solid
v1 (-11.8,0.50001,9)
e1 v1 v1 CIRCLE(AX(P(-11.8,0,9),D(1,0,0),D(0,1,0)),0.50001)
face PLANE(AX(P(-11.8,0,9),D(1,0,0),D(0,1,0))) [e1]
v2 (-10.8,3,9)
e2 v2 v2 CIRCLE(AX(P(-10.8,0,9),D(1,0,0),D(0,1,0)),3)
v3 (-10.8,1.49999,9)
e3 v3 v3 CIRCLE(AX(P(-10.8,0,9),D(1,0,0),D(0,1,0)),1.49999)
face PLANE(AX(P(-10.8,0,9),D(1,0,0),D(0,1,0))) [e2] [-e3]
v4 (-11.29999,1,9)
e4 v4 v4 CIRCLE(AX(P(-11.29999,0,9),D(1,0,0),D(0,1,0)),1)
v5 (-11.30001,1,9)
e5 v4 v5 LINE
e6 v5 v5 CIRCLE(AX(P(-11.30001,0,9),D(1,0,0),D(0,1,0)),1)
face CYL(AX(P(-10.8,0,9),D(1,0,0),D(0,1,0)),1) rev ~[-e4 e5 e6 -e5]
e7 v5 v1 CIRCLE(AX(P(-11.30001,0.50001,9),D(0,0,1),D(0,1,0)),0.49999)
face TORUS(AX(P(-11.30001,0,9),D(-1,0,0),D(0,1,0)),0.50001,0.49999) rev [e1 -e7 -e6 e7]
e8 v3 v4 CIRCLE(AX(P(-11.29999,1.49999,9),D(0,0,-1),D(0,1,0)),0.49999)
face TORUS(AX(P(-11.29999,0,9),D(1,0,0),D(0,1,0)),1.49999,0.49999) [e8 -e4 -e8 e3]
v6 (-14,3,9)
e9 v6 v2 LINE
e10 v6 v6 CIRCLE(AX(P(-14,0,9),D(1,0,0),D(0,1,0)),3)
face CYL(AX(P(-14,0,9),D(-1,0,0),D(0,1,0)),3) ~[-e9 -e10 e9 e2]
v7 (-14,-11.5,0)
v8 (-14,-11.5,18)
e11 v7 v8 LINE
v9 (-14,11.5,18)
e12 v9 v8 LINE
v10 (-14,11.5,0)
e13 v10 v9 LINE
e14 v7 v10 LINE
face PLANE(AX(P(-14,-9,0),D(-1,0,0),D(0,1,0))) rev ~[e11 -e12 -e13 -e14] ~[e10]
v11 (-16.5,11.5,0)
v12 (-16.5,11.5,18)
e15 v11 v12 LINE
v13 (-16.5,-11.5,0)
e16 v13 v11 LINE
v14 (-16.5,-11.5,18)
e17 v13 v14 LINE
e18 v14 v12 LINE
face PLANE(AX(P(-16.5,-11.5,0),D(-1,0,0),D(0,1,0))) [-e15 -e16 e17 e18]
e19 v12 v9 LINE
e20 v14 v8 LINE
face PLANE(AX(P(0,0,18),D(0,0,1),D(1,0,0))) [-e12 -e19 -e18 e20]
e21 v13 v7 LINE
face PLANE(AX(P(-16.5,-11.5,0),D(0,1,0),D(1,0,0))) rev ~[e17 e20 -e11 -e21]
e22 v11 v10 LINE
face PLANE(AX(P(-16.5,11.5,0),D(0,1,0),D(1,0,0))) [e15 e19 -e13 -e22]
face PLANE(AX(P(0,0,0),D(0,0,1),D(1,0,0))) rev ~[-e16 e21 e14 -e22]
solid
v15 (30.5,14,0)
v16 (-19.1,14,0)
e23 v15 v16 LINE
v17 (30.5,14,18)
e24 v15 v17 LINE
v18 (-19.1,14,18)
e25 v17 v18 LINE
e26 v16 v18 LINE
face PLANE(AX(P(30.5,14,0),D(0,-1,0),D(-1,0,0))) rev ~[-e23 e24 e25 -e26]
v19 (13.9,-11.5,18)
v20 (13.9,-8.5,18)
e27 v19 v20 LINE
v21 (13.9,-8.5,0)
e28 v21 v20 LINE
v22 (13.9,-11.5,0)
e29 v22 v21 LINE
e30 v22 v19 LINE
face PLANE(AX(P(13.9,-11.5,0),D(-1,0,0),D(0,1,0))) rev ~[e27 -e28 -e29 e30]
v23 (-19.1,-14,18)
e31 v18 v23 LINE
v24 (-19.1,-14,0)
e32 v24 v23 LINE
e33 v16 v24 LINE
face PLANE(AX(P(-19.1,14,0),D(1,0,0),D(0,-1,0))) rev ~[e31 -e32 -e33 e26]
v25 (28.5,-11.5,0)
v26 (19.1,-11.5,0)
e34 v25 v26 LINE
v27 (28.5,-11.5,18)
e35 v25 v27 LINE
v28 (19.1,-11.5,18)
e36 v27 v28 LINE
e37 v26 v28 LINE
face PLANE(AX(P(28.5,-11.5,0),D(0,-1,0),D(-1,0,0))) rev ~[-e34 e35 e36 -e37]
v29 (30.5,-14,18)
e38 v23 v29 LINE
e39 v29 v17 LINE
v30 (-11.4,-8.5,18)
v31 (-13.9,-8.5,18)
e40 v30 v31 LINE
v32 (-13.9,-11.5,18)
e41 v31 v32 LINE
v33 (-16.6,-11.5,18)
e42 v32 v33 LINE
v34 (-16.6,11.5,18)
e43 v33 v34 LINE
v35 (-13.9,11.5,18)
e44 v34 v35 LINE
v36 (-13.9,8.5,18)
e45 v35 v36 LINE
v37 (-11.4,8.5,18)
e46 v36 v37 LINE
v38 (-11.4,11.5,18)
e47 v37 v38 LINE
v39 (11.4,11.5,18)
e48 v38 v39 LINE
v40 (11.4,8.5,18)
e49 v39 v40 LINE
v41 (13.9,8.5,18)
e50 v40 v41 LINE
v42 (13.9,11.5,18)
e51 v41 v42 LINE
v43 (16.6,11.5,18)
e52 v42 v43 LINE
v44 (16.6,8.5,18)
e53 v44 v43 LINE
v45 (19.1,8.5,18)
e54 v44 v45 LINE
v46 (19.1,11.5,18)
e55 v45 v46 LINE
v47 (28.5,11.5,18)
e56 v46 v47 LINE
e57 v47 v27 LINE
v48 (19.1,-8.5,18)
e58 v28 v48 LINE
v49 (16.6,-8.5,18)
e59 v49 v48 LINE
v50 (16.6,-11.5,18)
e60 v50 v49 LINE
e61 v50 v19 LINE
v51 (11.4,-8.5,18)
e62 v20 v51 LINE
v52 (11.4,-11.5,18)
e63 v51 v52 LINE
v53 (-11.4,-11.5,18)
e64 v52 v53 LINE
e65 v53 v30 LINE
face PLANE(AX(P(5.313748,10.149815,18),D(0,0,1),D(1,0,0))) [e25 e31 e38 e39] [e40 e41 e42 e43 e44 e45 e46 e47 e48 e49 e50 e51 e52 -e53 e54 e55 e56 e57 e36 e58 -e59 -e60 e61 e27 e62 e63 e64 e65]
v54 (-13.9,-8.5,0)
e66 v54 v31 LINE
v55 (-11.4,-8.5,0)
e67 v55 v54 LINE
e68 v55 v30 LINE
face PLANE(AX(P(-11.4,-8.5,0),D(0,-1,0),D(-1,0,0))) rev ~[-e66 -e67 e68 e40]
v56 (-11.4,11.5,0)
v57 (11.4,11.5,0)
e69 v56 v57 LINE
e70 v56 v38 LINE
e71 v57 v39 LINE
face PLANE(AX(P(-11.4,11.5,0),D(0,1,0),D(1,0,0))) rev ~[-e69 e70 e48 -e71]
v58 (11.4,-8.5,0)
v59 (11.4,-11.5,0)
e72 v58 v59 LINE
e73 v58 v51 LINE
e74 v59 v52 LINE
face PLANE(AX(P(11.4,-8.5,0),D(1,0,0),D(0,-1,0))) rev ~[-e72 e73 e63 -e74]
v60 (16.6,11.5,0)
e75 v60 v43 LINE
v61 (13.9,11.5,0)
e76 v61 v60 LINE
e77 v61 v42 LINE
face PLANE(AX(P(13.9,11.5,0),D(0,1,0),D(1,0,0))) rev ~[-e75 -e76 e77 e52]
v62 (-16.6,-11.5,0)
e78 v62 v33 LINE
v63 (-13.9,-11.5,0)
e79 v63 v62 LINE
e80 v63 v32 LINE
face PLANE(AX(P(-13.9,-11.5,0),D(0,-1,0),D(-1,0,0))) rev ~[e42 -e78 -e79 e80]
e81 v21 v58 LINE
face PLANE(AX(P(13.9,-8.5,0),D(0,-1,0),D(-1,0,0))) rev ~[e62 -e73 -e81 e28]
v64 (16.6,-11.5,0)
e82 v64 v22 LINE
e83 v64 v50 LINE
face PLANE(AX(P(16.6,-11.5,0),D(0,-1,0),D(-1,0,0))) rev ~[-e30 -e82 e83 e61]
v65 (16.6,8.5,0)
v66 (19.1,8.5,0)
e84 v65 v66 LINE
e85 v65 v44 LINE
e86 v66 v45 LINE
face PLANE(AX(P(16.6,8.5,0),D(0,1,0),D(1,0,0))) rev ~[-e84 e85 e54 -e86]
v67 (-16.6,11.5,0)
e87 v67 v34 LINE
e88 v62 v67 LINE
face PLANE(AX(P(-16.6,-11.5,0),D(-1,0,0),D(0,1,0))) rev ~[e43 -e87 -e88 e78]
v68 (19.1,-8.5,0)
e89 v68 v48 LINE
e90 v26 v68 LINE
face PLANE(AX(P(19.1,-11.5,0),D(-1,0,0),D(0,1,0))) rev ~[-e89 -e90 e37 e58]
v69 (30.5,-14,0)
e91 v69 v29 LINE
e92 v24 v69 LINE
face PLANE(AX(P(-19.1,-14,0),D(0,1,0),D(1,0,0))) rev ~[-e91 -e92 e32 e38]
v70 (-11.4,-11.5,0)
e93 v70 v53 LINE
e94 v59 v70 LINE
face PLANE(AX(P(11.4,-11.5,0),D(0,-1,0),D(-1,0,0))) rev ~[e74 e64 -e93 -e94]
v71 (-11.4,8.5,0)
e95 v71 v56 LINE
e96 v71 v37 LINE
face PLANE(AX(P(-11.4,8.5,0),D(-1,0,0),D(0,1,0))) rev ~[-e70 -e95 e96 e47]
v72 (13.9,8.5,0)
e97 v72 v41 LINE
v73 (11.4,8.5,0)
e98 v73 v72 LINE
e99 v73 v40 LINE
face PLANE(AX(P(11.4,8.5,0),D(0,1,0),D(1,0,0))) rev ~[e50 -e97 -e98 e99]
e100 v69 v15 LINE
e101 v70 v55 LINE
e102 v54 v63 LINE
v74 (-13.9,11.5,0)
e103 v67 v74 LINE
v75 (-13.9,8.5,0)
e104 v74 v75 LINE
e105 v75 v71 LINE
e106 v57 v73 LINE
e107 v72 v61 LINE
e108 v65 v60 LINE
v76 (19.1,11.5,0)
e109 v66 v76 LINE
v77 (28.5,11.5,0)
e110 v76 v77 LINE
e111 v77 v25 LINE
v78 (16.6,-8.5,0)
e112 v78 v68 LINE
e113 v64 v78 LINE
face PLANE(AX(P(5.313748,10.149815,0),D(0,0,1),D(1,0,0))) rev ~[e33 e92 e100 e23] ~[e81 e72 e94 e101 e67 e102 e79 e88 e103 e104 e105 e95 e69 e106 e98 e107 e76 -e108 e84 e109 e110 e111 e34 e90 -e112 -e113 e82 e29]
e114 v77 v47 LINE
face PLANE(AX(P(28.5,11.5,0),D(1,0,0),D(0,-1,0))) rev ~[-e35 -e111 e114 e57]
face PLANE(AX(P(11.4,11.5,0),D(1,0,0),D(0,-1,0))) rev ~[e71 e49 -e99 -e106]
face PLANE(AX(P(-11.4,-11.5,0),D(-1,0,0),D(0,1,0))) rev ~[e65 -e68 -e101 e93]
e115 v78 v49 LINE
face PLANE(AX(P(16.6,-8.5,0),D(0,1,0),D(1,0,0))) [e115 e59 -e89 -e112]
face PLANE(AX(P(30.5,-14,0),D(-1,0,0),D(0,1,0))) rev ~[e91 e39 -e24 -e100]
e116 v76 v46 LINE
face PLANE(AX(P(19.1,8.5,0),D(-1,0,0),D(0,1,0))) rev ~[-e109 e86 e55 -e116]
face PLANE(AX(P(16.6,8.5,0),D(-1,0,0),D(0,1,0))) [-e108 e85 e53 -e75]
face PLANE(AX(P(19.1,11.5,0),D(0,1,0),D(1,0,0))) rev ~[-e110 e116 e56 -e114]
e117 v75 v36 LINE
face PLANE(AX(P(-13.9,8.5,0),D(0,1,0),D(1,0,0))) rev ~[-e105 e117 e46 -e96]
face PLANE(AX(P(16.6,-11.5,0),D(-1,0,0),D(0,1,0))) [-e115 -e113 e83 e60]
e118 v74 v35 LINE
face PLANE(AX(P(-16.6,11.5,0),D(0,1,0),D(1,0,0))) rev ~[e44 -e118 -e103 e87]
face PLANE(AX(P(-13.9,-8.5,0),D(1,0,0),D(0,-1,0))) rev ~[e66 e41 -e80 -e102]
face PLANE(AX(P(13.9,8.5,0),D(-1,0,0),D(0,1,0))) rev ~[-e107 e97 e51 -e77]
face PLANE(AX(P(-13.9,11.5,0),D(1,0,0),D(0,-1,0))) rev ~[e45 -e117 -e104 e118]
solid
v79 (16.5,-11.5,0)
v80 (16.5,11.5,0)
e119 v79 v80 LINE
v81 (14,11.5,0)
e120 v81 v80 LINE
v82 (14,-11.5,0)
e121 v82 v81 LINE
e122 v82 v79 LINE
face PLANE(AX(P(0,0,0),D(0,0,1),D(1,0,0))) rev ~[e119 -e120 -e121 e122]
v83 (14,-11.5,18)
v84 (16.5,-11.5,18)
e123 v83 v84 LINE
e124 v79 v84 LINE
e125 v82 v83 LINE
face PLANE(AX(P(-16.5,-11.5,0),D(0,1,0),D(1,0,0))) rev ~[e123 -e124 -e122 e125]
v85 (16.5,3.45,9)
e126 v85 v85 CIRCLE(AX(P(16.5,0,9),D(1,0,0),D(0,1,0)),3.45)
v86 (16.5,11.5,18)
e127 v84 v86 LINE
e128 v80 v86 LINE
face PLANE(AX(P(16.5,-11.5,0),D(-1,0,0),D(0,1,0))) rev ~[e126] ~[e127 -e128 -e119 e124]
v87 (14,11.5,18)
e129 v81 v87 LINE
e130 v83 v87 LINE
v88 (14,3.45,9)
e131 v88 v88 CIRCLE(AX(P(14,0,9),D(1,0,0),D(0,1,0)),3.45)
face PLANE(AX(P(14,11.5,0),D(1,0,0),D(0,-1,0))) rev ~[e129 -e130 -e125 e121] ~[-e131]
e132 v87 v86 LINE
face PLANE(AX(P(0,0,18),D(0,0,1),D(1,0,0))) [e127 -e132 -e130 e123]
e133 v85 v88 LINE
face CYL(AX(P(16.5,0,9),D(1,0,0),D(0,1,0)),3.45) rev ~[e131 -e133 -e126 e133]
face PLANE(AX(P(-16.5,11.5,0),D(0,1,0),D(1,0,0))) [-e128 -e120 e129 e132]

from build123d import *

# Parameters (mm, degrees)
F0_W      = 33
F0_H      = 23
F0_W_2    = 28
F0_H_2    = 18
F1_DEPTH  = 18
F2_R      = 3.45
F3_DEPTH  = 5
F4_R      = 3
F5_DEPTH  = 3.2
F6_R      = 1
F7_DEPTH  = 1
F8_R      = 0.49999
F9_W      = 2.5
F9_H      = 3
F10_DEPTH = 18
F11_W     = 28
F11_H     = 2.5
F12_DEPTH = 25


# Not quite as in the source:
# - a fillet or chamfer is up to 0.001 mm smaller than in the source, because OpenCascade refuses the exact size


with BuildPart() as f1:
    # F0 (on Top) → F1 (new body)
    with BuildSketch(Plane.XY):
        Rectangle(F0_W, F0_H)
        Rectangle(F0_W_2, F0_H_2, mode=Mode.SUBTRACT)
    extrude(amount=F1_DEPTH)

    # F2 (on face) → F3 (cut)
    with BuildSketch(Plane.YZ.offset(16.5)):
        with Locations((0, 9)):
            Circle(F2_R)
    extrude(amount=-F3_DEPTH, mode=Mode.SUBTRACT)

    # F4 (on face) → F5 (join)
    with BuildSketch(Plane.YZ.offset(-14)):
        with Locations((0, 9)):
            Circle(F4_R)
    extrude(amount=F5_DEPTH)

    # F6 (on face) → F7 (cut)
    with BuildSketch(Plane.YZ.offset(-10.8)):
        with Locations((0, 9)):
            Circle(F6_R)
    extrude(amount=-F7_DEPTH, mode=Mode.SUBTRACT)

    # F8 (radius 0.5 in the source; OpenCascade refuses exactly that, so slightly less here)
    f8_edges = [f1.edges().sort_by_distance(p)[0] for p in [
        (-11.8, -1, 9),
        (-10.8, -1, 9),
    ]]
    fillet(f8_edges, radius=F8_R)

    # F11 (on face) → F12 (cut)
    with BuildSketch(Plane(origin=(0, 0, 0), x_dir=(1, 0, 0), z_dir=(0, 0, -1))):
        with Locations((0, -10.25)):
            Rectangle(F11_W, F11_H)
        with Locations((0, 10.25)):
            Rectangle(F11_W, F11_H)
        Polygon((-14, -9), (14, -9), (14, 9), (-14, 9), (-14, 4.632844124), (-9.7779119387, 4.632844124), (-9.7779119387, -4.2528109625), (-14, -4.2528109625), align=None)
    extrude(amount=-F12_DEPTH, mode=Mode.SUBTRACT)


with BuildPart() as f10:
    # F9 (on Top) → F10 (new body)
    with BuildSketch(Plane.XY):
        Polygon((-19.1, 0), (-16.6, 0), (-16.6, 11.5), (-13.9, 11.5), (-13.9, 8.5), (-11.4, 8.5), (-11.4, 11.5), (11.4, 11.5), (11.4, 8.5), (13.9, 8.5), (13.9, 11.5), (16.6, 11.5), (19.1, 11.5), (28.5, 11.5), (28.5, 0), (30.5, 0), (30.5, 14), (-19.1, 14), align=None)
        Polygon((-16.6, -11.5), (-16.6, 0), (-19.1, 0), (-19.1, -14), (30.5, -14), (30.5, 0), (28.5, 0), (28.5, -11.5), (19.1, -11.5), (16.6, -11.5), (13.9, -11.5), (13.9, -8.5), (11.4, -8.5), (11.4, -11.5), (-11.4, -11.5), (-11.4, -8.5), (-13.9, -8.5), (-13.9, -11.5), align=None)
        with Locations((17.85, 10)):
            Rectangle(F9_W, F9_H)
        with Locations((17.85, -10)):
            Rectangle(F9_W, F9_H)
    extrude(amount=F10_DEPTH)


solid = Compound([f1.part, f10.part])
